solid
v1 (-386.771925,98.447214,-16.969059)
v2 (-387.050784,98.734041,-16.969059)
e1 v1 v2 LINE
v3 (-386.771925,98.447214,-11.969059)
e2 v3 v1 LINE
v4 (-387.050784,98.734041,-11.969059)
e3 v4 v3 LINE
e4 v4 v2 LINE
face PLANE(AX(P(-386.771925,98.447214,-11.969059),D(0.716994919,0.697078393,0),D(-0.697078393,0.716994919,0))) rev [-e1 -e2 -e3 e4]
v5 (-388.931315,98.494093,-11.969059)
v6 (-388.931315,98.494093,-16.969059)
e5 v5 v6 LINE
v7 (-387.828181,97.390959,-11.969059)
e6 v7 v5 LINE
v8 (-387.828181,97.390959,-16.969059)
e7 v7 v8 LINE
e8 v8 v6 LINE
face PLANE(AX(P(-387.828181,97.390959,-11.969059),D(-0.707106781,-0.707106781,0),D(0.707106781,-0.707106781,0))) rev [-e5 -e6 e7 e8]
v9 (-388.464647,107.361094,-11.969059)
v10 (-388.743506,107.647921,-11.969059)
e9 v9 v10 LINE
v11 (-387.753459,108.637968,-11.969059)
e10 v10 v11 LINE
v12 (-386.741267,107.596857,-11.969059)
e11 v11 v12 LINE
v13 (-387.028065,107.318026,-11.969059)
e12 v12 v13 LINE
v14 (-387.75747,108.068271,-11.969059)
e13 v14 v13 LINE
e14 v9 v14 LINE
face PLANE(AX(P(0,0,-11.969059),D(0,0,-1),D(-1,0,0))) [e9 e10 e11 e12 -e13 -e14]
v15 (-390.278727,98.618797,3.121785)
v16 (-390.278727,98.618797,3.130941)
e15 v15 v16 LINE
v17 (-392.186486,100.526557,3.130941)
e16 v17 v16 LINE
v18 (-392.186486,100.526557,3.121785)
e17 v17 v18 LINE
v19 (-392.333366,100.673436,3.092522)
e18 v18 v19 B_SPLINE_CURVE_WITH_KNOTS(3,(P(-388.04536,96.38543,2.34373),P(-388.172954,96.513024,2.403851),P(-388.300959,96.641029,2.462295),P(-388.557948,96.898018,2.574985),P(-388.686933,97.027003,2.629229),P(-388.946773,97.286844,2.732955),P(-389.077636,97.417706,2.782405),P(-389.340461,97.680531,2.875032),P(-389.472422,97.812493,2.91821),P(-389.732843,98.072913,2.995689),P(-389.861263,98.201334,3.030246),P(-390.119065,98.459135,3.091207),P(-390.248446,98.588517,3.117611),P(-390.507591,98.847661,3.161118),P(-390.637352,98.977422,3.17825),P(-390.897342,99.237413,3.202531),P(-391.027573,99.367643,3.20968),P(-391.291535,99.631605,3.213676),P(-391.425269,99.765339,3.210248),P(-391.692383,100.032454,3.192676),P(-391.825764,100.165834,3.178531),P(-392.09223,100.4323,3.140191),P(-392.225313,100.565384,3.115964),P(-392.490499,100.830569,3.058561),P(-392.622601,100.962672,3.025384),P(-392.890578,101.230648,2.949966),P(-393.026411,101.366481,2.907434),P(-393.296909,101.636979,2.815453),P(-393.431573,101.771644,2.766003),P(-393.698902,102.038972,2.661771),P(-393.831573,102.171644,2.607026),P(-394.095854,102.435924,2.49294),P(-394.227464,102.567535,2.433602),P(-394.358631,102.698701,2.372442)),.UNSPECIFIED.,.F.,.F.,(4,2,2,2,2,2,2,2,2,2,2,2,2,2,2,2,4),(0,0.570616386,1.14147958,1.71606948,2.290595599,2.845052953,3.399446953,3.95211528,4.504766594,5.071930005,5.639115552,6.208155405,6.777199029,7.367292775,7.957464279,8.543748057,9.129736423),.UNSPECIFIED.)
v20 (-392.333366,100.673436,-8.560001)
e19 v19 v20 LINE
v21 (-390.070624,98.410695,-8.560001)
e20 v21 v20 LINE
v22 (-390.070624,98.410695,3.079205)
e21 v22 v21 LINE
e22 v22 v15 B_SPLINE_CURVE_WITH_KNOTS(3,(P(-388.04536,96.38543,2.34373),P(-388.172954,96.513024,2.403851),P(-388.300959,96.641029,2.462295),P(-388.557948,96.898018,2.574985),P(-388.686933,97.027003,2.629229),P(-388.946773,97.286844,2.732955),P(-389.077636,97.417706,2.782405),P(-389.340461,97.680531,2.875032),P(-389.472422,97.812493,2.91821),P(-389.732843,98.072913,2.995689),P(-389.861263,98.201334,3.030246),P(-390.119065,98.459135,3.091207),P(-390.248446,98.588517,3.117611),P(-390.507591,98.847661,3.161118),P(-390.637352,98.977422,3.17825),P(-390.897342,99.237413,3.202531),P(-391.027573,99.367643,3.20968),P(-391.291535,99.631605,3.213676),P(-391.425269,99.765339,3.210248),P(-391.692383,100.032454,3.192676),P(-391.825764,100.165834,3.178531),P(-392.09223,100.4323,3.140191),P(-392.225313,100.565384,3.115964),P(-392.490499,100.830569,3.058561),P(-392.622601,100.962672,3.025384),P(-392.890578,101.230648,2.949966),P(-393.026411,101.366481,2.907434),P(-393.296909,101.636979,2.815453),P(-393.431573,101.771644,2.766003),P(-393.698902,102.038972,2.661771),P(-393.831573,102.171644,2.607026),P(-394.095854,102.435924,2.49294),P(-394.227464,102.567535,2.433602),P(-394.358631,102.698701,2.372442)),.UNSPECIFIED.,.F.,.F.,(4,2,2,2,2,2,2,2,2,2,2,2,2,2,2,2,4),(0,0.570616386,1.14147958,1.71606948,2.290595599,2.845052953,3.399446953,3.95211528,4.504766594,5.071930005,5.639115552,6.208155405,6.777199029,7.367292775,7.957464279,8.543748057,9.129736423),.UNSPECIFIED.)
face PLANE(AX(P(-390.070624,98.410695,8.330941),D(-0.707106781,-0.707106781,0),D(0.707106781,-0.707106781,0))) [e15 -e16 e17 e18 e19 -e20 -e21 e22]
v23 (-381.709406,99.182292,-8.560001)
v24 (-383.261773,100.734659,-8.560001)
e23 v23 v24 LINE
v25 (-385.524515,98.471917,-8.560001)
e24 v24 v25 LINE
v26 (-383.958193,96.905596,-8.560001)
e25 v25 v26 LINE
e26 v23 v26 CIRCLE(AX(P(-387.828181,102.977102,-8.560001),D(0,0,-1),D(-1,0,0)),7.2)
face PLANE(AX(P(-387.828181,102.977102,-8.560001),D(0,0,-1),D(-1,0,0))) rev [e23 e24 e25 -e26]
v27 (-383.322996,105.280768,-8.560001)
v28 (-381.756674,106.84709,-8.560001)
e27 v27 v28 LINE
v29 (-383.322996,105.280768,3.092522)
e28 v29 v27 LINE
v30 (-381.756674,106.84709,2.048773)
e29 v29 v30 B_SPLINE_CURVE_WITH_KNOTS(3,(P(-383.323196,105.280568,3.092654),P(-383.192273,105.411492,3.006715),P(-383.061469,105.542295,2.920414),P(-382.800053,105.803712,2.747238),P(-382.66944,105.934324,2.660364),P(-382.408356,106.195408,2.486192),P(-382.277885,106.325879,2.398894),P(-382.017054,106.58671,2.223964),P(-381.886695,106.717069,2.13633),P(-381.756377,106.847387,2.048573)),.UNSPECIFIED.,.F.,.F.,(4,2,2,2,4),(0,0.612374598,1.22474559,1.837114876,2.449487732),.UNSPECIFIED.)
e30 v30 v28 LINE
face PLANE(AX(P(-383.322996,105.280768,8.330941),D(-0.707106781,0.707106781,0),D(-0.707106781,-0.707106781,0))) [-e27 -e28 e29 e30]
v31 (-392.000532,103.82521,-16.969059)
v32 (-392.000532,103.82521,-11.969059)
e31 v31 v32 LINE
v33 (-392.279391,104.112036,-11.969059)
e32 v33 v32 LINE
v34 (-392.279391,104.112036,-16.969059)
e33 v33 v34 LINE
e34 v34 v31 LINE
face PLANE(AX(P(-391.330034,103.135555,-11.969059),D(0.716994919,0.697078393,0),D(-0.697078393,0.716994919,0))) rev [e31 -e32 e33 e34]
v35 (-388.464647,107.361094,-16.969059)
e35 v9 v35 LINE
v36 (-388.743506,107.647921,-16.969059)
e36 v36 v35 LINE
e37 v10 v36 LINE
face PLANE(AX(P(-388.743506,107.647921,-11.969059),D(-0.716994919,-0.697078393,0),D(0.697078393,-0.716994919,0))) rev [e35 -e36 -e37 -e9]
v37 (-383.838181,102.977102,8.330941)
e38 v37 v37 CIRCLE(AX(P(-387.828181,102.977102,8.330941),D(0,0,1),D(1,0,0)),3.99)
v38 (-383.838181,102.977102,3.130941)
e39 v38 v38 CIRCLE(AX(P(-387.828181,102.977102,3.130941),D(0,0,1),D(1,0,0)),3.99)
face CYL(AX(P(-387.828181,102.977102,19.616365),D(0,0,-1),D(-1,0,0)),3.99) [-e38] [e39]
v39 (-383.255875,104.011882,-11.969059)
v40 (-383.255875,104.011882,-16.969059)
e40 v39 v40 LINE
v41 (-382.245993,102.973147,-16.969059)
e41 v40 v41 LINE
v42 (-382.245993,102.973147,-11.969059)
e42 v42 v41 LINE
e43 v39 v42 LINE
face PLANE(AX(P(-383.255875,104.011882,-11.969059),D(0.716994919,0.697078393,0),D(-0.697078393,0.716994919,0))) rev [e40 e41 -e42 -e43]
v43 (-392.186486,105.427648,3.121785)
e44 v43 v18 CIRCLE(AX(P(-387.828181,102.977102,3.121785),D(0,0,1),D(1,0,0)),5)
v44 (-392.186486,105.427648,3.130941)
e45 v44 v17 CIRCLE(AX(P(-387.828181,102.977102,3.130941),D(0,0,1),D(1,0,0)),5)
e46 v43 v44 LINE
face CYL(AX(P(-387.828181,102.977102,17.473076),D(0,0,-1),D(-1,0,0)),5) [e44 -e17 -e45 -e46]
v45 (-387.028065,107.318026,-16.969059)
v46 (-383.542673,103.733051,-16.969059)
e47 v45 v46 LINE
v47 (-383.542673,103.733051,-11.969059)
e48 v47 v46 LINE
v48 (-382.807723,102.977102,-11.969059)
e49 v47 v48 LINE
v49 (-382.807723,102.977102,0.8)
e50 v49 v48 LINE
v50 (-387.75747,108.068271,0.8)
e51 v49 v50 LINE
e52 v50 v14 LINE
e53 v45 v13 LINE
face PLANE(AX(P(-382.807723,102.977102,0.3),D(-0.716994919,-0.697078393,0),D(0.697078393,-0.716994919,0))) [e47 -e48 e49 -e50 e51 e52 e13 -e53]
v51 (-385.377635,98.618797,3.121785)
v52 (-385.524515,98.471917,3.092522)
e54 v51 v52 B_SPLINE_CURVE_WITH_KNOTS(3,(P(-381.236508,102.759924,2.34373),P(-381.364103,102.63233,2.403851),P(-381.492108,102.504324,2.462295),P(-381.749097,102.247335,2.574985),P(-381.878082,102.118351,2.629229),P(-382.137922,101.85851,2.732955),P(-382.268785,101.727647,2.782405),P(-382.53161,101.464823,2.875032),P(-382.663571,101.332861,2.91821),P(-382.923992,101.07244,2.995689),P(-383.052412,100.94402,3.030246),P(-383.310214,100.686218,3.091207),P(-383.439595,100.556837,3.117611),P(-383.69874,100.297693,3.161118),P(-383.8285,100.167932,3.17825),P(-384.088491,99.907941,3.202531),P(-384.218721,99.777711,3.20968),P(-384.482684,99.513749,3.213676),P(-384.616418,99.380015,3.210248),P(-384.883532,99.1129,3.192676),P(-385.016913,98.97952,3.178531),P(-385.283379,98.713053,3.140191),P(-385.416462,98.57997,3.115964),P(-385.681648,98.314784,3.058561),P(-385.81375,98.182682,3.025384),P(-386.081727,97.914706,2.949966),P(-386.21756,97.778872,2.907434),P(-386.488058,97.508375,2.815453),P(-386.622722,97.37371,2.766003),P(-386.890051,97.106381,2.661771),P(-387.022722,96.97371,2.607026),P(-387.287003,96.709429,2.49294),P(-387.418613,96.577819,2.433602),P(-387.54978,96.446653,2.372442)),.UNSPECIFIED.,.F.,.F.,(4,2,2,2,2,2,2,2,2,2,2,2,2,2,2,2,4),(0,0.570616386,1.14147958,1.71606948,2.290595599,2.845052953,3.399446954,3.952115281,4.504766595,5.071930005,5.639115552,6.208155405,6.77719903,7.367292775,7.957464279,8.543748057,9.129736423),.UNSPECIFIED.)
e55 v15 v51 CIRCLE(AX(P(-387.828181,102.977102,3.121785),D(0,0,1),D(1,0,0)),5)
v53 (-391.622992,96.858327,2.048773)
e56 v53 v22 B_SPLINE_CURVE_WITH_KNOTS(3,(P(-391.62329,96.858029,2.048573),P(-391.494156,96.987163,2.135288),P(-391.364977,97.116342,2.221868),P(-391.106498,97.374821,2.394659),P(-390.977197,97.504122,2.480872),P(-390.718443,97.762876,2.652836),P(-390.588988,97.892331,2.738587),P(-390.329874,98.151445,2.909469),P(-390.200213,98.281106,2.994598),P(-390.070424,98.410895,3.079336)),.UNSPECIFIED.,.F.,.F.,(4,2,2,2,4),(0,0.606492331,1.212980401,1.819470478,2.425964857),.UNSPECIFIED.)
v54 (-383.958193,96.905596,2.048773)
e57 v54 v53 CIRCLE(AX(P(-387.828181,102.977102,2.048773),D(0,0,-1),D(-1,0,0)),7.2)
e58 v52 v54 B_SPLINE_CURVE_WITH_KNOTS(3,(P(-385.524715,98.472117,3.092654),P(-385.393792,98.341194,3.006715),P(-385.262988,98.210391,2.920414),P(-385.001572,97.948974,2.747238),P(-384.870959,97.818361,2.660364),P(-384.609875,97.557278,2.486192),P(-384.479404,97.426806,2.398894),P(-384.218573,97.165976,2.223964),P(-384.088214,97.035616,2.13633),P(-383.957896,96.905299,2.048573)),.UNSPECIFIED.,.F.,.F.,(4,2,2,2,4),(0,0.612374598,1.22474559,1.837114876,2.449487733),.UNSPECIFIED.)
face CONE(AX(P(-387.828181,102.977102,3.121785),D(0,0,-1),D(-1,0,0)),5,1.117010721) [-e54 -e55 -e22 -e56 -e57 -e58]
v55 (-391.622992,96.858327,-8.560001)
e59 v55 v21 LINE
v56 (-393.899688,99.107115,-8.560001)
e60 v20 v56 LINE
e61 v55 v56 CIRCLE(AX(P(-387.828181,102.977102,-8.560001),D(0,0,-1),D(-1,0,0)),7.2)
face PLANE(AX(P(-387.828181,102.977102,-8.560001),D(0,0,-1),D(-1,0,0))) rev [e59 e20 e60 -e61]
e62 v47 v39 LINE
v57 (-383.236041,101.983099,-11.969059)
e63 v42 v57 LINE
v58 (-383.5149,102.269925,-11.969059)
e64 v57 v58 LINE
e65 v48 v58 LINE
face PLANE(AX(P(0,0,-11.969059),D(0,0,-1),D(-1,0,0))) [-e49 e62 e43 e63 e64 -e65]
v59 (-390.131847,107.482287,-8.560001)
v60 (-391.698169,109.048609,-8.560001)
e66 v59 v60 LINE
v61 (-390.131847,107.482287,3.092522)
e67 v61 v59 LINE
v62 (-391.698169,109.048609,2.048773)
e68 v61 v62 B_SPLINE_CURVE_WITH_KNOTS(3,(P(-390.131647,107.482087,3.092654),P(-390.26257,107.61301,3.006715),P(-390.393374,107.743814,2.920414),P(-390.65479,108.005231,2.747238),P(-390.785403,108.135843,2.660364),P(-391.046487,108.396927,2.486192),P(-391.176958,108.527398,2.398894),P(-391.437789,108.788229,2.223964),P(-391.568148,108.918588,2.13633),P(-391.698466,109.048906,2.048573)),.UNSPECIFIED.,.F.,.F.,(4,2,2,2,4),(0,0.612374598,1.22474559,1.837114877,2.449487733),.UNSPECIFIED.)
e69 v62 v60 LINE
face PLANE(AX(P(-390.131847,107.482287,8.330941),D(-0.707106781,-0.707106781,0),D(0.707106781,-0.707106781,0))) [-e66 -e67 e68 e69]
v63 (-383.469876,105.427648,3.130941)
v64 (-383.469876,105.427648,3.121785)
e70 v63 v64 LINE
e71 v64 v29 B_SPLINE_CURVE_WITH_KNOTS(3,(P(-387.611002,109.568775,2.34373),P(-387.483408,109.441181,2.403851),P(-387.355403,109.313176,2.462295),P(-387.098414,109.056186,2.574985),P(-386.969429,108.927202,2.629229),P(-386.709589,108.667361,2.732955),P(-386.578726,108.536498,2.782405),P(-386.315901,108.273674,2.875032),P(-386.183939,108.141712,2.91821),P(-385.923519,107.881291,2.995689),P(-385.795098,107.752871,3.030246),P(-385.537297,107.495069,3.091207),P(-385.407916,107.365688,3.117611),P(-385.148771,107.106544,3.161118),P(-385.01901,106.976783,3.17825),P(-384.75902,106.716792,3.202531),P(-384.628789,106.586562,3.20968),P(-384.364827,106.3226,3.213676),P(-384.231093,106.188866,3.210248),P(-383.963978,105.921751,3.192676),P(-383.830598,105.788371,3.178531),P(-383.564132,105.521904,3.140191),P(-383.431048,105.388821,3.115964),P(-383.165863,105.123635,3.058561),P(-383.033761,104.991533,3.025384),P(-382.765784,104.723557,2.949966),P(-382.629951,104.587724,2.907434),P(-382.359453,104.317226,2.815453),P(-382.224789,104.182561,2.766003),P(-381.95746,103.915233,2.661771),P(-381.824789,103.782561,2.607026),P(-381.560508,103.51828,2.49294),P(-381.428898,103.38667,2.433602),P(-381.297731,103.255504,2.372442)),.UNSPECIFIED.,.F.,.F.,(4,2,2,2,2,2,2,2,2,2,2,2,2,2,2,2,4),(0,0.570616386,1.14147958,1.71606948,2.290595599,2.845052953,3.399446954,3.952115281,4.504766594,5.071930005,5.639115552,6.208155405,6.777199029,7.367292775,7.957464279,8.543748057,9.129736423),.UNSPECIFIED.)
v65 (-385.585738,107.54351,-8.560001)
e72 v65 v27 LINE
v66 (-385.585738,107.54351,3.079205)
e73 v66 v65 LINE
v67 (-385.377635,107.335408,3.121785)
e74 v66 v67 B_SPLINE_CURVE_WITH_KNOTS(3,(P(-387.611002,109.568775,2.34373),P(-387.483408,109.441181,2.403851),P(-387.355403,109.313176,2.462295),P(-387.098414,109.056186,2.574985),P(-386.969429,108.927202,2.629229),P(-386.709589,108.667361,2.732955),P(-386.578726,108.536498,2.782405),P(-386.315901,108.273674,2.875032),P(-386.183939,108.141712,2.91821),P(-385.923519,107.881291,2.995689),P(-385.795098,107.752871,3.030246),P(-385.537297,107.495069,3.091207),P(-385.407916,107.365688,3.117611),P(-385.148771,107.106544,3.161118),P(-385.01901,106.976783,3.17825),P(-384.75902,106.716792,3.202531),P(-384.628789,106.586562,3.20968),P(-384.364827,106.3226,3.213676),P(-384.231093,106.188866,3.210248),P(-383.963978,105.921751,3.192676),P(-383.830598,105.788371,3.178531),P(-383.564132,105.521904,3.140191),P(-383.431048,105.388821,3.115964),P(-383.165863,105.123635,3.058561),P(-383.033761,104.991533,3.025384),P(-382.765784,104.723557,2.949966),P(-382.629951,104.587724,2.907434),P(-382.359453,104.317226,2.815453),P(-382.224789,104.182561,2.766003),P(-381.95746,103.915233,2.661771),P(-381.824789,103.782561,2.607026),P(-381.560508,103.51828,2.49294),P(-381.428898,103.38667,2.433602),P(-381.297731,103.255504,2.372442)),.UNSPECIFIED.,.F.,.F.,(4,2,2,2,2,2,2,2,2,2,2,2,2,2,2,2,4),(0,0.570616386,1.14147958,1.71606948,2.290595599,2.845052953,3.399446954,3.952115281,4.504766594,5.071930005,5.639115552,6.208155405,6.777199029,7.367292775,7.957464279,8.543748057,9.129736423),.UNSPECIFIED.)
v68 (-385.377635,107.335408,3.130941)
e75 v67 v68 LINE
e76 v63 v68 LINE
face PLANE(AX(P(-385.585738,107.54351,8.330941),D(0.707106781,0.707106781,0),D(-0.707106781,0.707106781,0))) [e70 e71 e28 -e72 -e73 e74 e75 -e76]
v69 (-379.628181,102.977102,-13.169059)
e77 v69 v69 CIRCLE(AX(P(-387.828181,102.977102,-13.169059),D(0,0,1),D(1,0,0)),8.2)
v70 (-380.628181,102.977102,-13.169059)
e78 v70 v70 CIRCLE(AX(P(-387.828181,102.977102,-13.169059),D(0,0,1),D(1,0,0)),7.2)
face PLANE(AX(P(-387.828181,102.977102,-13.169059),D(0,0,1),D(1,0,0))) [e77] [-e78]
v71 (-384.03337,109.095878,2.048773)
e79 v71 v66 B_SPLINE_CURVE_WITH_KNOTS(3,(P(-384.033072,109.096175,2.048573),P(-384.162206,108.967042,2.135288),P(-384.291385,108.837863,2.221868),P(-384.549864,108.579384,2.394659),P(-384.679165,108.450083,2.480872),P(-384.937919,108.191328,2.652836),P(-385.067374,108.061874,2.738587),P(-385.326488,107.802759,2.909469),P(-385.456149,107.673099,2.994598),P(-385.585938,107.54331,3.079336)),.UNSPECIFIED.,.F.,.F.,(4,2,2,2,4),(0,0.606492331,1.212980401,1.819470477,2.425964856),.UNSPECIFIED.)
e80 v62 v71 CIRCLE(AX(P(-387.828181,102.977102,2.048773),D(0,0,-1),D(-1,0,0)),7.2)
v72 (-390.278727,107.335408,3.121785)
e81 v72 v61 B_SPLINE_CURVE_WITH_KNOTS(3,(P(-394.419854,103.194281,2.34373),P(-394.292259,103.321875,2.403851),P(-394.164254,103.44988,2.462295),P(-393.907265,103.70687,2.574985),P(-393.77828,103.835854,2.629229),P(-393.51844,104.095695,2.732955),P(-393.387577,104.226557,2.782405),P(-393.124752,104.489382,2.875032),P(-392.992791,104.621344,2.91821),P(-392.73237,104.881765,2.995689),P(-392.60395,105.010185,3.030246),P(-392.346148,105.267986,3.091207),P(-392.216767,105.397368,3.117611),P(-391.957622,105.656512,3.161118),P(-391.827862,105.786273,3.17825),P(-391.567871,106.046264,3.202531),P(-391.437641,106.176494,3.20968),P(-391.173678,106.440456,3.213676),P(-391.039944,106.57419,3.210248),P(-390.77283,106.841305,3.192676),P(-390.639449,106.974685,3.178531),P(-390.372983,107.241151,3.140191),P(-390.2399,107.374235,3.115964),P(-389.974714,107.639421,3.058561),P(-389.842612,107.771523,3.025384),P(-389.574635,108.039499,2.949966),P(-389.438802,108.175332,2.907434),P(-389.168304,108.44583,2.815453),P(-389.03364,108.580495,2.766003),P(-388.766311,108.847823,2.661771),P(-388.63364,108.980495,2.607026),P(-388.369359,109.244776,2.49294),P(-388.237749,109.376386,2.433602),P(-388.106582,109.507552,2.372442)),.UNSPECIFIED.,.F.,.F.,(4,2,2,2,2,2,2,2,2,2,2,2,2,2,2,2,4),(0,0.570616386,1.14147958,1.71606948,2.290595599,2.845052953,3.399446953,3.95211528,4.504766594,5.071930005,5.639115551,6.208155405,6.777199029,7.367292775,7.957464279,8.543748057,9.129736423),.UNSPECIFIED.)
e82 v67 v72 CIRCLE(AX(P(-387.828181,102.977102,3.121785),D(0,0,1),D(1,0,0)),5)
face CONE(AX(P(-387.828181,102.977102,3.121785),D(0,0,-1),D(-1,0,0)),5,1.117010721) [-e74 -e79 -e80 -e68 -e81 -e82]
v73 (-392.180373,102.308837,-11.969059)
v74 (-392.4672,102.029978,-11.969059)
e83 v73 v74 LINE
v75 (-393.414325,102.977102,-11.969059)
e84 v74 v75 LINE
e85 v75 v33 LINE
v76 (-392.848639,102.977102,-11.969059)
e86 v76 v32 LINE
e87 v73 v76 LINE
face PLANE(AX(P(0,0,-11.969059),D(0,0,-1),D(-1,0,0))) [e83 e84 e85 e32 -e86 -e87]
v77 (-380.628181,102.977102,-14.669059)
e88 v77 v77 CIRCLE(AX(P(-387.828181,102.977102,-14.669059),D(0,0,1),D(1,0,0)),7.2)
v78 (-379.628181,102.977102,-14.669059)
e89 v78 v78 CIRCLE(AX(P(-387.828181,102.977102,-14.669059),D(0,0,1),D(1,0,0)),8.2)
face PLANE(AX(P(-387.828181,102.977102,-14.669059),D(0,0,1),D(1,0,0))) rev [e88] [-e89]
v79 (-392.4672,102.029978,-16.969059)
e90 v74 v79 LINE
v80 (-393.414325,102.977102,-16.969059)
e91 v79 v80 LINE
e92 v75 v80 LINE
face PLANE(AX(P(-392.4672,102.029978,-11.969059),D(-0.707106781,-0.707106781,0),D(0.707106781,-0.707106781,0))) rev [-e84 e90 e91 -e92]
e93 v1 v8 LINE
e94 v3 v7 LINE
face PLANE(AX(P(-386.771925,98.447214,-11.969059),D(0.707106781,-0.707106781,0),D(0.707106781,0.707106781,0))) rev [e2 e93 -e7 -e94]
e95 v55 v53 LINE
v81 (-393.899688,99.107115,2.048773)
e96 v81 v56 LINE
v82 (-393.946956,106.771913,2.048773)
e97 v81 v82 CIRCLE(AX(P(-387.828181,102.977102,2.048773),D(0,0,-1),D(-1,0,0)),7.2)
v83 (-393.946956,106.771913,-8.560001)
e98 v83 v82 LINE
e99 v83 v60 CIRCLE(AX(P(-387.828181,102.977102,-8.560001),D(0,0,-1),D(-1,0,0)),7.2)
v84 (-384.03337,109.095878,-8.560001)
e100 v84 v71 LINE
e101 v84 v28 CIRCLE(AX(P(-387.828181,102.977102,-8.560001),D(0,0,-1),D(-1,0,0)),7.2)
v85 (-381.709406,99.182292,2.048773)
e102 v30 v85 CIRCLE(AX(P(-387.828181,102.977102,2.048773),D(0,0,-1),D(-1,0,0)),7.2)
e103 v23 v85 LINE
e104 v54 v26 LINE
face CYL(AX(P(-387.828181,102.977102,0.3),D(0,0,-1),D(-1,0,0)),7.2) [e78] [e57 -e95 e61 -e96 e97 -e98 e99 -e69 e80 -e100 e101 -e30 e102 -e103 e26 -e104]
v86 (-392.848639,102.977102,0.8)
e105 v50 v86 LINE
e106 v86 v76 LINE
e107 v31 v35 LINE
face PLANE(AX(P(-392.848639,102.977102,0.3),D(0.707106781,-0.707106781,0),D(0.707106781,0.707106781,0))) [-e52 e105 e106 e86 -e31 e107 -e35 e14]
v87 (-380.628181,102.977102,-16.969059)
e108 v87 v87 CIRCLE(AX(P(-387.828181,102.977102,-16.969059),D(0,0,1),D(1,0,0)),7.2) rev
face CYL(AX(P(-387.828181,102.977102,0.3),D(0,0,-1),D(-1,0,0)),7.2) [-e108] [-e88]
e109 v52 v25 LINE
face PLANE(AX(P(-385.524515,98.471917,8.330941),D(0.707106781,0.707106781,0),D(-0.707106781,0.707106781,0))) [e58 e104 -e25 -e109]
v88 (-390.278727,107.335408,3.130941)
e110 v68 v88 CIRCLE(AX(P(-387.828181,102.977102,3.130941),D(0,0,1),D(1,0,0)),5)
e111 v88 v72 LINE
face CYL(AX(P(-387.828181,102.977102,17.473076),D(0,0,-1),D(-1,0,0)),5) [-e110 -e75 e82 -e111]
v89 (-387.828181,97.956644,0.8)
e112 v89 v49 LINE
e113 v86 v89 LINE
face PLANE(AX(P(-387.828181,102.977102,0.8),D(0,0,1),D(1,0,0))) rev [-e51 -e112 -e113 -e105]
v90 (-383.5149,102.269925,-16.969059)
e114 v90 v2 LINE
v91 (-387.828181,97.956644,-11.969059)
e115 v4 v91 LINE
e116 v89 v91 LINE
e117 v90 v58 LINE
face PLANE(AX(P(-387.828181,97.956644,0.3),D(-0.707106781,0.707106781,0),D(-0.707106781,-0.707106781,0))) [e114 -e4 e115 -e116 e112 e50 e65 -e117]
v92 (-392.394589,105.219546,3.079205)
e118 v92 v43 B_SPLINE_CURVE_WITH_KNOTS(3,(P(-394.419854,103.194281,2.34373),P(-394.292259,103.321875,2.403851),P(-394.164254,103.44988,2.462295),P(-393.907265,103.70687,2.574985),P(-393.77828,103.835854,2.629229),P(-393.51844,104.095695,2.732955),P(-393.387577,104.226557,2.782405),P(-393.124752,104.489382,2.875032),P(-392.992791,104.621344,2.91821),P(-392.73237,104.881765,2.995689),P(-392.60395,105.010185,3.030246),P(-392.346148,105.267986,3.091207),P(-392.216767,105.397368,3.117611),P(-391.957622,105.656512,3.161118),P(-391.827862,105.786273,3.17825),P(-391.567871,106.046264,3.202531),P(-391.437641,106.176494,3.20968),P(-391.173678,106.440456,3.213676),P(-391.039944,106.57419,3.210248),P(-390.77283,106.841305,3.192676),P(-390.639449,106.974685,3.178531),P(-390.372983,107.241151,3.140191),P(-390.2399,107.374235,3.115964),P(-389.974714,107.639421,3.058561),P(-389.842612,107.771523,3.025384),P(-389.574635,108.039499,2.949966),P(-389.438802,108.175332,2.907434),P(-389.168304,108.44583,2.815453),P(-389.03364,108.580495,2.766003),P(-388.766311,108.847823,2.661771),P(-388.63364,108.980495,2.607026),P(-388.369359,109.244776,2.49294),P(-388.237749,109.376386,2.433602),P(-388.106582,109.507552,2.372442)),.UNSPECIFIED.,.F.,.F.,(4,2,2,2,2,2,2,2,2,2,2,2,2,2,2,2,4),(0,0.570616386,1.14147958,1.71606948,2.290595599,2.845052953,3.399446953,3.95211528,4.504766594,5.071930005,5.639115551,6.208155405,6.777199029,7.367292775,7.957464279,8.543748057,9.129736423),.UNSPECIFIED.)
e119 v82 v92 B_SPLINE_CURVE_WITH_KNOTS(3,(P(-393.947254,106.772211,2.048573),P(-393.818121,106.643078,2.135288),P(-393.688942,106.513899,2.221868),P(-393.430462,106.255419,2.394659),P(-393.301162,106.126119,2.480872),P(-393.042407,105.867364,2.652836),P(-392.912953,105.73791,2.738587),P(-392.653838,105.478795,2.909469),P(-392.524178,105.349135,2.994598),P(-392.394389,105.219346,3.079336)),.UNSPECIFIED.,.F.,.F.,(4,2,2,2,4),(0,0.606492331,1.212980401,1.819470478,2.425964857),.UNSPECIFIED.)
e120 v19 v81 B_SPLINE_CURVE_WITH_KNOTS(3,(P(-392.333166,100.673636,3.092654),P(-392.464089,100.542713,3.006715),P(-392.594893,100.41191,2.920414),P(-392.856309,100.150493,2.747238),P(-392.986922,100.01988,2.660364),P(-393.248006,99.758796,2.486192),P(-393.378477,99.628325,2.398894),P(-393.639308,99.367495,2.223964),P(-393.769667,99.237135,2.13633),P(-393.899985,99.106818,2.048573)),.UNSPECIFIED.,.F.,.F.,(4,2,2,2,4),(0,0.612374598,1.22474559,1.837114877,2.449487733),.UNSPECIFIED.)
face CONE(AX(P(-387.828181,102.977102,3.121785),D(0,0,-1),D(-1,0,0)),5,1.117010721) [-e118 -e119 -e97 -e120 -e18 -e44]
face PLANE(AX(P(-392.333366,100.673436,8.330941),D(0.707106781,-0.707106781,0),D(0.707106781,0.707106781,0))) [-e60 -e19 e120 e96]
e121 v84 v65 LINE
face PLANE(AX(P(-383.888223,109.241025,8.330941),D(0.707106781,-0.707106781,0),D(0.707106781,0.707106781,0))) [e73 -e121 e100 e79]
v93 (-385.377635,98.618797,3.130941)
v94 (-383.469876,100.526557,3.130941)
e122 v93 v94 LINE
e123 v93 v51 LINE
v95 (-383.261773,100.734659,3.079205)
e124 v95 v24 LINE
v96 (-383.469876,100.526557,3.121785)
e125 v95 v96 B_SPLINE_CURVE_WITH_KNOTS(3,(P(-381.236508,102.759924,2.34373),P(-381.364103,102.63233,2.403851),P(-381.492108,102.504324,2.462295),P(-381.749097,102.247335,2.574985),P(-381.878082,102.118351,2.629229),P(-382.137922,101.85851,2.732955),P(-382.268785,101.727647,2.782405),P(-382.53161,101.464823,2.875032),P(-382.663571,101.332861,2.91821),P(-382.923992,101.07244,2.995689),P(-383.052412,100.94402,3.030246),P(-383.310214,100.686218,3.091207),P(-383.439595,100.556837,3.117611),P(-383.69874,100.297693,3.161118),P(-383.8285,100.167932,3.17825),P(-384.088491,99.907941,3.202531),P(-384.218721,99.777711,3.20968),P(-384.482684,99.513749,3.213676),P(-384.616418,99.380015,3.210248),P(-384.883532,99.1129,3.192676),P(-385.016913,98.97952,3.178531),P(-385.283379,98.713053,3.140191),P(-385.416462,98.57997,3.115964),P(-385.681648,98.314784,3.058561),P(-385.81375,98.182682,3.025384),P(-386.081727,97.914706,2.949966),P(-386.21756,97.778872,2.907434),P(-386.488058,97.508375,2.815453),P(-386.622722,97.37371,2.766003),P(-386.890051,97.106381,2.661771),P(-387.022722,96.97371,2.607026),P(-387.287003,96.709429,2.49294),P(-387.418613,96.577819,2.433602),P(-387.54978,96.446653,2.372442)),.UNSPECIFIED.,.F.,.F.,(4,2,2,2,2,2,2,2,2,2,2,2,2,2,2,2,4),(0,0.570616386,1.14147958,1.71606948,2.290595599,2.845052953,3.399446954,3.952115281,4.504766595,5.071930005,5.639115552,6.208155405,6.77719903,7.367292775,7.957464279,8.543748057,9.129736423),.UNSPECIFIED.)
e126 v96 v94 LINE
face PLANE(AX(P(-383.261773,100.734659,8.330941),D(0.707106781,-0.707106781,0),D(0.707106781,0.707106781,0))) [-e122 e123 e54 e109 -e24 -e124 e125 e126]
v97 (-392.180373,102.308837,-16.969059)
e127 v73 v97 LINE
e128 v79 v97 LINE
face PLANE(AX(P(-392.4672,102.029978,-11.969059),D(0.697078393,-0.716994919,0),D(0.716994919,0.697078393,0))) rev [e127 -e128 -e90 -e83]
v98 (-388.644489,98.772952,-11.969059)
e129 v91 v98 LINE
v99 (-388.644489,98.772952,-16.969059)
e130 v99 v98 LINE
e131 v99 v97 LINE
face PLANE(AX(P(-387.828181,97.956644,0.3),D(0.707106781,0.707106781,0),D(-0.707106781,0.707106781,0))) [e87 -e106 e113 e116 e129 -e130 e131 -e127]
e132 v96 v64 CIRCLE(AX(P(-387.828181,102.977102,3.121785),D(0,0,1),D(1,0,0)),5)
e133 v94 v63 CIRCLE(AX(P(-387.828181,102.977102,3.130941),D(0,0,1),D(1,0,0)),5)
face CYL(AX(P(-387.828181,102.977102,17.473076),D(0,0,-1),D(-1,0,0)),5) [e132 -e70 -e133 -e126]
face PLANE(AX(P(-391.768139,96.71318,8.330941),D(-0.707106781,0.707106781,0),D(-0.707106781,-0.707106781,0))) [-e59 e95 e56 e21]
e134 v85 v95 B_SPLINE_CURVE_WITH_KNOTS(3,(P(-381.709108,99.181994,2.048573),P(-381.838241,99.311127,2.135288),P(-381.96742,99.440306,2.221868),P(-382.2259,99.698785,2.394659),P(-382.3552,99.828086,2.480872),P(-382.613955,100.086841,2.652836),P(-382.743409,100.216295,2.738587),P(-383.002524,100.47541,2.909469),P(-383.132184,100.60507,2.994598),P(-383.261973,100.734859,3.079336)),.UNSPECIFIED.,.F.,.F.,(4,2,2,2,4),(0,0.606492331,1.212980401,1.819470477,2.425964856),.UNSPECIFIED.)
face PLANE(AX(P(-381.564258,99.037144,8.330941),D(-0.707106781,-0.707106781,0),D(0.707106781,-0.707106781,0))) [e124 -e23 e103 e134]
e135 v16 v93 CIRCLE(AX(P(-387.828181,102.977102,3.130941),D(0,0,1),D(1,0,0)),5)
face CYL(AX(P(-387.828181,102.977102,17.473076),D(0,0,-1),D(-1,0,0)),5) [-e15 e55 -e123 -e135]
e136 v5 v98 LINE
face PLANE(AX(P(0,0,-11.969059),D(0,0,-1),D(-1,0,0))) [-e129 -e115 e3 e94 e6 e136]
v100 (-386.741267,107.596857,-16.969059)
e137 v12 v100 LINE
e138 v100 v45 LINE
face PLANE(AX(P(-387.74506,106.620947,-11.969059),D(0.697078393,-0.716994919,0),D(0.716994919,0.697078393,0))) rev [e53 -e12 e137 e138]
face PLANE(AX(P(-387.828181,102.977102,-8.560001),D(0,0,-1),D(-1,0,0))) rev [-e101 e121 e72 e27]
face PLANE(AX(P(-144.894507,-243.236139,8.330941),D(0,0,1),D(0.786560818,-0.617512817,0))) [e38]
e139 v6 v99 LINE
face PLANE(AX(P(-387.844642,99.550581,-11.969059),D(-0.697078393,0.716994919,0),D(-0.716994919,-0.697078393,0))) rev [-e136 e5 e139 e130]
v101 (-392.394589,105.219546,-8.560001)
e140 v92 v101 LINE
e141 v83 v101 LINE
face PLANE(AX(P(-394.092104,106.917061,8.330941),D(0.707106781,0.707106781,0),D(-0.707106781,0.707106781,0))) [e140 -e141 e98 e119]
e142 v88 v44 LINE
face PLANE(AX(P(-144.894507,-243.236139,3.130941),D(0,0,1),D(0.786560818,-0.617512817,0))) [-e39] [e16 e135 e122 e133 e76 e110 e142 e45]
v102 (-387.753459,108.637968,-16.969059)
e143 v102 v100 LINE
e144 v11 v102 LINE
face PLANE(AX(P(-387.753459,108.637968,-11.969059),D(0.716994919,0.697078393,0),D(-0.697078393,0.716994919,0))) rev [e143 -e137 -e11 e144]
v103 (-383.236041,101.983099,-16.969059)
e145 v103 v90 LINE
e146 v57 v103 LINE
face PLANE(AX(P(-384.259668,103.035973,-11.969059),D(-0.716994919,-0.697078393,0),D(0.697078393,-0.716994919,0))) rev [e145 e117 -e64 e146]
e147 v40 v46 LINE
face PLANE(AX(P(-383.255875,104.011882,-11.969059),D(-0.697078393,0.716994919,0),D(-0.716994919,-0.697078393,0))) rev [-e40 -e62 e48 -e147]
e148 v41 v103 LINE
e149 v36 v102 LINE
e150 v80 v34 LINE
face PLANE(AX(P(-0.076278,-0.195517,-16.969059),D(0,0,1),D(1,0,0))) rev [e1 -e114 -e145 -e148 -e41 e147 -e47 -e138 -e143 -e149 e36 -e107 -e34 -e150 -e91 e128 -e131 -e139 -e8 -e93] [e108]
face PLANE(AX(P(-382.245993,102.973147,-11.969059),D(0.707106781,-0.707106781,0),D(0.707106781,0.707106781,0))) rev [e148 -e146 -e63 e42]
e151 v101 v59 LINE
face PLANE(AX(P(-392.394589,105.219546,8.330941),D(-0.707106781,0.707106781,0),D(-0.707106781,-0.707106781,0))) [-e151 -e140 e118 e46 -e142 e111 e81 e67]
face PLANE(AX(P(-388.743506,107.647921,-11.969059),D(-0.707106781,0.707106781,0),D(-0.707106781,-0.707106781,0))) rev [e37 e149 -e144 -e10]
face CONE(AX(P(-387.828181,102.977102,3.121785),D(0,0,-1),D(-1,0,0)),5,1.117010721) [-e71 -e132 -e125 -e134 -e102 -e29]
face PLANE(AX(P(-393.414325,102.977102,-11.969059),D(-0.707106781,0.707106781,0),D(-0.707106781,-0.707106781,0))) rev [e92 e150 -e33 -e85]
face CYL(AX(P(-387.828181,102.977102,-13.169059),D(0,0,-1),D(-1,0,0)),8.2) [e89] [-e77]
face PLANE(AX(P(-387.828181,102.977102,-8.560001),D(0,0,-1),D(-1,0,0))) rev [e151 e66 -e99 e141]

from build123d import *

# Parameters (mm, degrees)
EXTRUDE_1_DEPTH      = 0.3
EXTRUDE_1_DEPTH_BACK = 16.969059
SKETCH_1_R           = 7.2
SKETCH_1_2_R         = 7.2
EXTRUDE_2_DEPTH      = 2
SKETCH_2_R           = 3.99
EXTRUDE_3_DEPTH      = 6.330940566
SKETCH_2_3_R         = 5
SKETCH_2_3_R_2       = 3.99
EXTRUDE_4_DEPTH      = 1.130940566
CHAMFER_1_SIZE       = 2.3
CHAMFER_1_SIZE_2     = 1.121784954
EXTRUDE_START        = 0.3
SKETCH_3_R           = 8.2
SKETCH_3_R_2         = 7.2
EXTRUDE_5_DEPTH      = 1.5
CUT_EXTRUDE_START    = 0.1
SKETCH_5_R           = 31.525677416
CUT_EXTRUDE_1_DEPTH  = 412.780220489
CUT_EXTRUDE_2_DEPTH  = 5
MOVE_FACE_1_BY       = 0.8


with BuildPart() as part:
    # Эскиз1 → Бобышка-Вытянуть1 (new, two sides: drawn at the far end of the back side and taken through both)
    with BuildSketch(Plane.XY.offset(-EXTRUDE_1_DEPTH_BACK)):
        with Locations((-387.828180977, 102.977102389)):
            Circle(SKETCH_1_R)
        Polygon((-387.828180977, 97.956644243), (-382.80772283, 102.977102389), (-387.757470299, 108.068271214), (-392.848639123, 102.977102389), align=None, mode=Mode.SUBTRACT)
    extrude(amount=EXTRUDE_1_DEPTH + EXTRUDE_1_DEPTH_BACK)

    # Эскиз1<2> → Бобышка-Вытянуть2 (add)
    with BuildSketch(Plane.XY):
        with Locations((-387.828180977, 102.977102389)):
            Circle(SKETCH_1_2_R)
    extrude(amount=EXTRUDE_2_DEPTH)

    # Эскиз2 → Бобышка-Вытянуть3 (add)
    with BuildSketch(Plane.XY.offset(2)):
        with Locations((-387.828180977, 102.977102389)):
            Circle(SKETCH_2_R)
    extrude(amount=EXTRUDE_3_DEPTH)

    # Эскиз2<3> → Бобышка-Вытянуть4 (add)
    with BuildSketch(Plane.XY.offset(2)):
        with Locations(Location((-387.828180977, 102.977102389, 0), (0, 0, 180))):
            Circle(SKETCH_2_3_R)
        with Locations((-387.828180977, 102.977102389)):
            Circle(SKETCH_2_3_R_2, mode=Mode.SUBTRACT)
    extrude(amount=EXTRUDE_4_DEPTH)

    # Фаска1
    # the kernel refuses this chamfer: 2.3, 1.121784954 mm, written as the material it adds along each edge
    with BuildSketch(Plane(origin=(-387.828180977, 102.977102389, 2), x_dir=(-1, 0, 0), z_dir=(0, 1, 0))) as chamfer_1_piece_1_section:
        Polygon((5 + CHAMFER_1_SIZE, 0), (5, CHAMFER_1_SIZE_2), (5, 0), align=None)
    chamfer_1_piece_1 = revolve(axis=Axis((-387.828180977, 102.977102389, 2), (0, 0, 1)), mode=Mode.PRIVATE)
    chamfer_1_piece_1 = chamfer_1_piece_1 & Plane(origin=(-387.828180977, 102.977102389, 2.571661691), x_dir=(1, 0, 0), z_dir=(0, 0, -1)) * Cylinder(7.2, 30, mode=Mode.PRIVATE)
    add(chamfer_1_piece_1)

    # Эскиз3 → Бобышка-Вытянуть5 (add)
    with BuildSketch(Plane.XY.offset(-14.969059434).offset(EXTRUDE_START)):
        with Locations((-387.828180977, 102.977102389)):
            Circle(SKETCH_3_R)
        with Locations(Location((-387.828180977, 102.977102389, 0), (0, 0, 180))):
            Circle(SKETCH_3_R_2, mode=Mode.SUBTRACT)
    extrude(amount=EXTRUDE_5_DEPTH)

    # Эскиз5 → Вырез-Вытянуть1 (cut, through all)
    with BuildSketch(Plane(origin=(0, 0, -8.460000998), x_dir=(-1, 0, 0), z_dir=(0, 0, -1)).offset(CUT_EXTRUDE_START)):
        with Locations((387.828180977, 102.977102389)):
            Circle(SKETCH_5_R)
        with BuildLine():
            Line((385.524514896, 98.471917351), (383.813441597, 96.760844053))
            ThreePointArc((383.813441597, 96.760844053), (387.783841084, 95.57723523), (391.7681393, 96.713179624))
            Line((391.7681393, 96.713179624), (390.070624315, 98.410694608))
            Line((390.070624315, 98.410694608), (392.333366015, 100.673436308))
            Line((392.333366015, 100.673436308), (394.044439314, 98.962363009))
            ThreePointArc((394.044439314, 98.962363009), (395.228048136, 102.932762497), (394.092103743, 106.917060712))
            Line((394.092103743, 106.917060712), (392.394588758, 105.219545727))
            Line((392.394588758, 105.219545727), (390.131847058, 107.482287427))
            Line((390.131847058, 107.482287427), (391.842920357, 109.193360726))
            ThreePointArc((391.842920357, 109.193360726), (387.87252087, 110.376969549), (383.888222654, 109.241025155))
            Line((383.888222654, 109.241025155), (385.585737639, 107.54351017))
            Line((385.585737639, 107.54351017), (383.322995939, 105.280768471))
            Line((383.322995939, 105.280768471), (381.61192264, 106.99184177))
            ThreePointArc((381.61192264, 106.99184177), (380.428313818, 103.021442282), (381.564258211, 99.037144067))
            Line((381.564258211, 99.037144067), (383.261773196, 100.734659051))
            Line((383.261773196, 100.734659051), (385.524514896, 98.471917351))
        make_face(mode=Mode.SUBTRACT)
    extrude(amount=-CUT_EXTRUDE_1_DEPTH, mode=Mode.SUBTRACT)

    # Эскиз6 → Вырез-Вытянуть2 (cut)
    with BuildSketch(Plane(origin=(0, 0, -16.969059434), x_dir=(-1, 0, 0), z_dir=(0, 0, -1))):
        Polygon((392.467199832, 102.029977673), (391.330034344, 103.13555523), (392.279390791, 104.112036147), (393.414324548, 102.977102389), align=None)
        Polygon((383.255874897, 104.011882353), (384.259667783, 103.035972602), (383.236040731, 101.983099063), (382.245993053, 102.973146742), align=None)
        Polygon((386.771925298, 98.447214497), (387.844642377, 99.550580636), (388.931315265, 98.494093106), (387.828180977, 97.390958818), align=None)
        Polygon((387.753458546, 108.637968392), (386.741266863, 107.596856947), (387.74505975, 106.620947196), (388.743506224, 107.647920713), align=None)
    extrude(amount=-CUT_EXTRUDE_2_DEPTH, mode=Mode.SUBTRACT)

    # Move Face 1: a face moved inward by 0.8
    extrude(part.faces().sort_by_distance((-387.816313451, 103.000672615, 0))[0], amount=MOVE_FACE_1_BY, dir=(0, 0, 1), mode=Mode.SUBTRACT)


solid = part.part
